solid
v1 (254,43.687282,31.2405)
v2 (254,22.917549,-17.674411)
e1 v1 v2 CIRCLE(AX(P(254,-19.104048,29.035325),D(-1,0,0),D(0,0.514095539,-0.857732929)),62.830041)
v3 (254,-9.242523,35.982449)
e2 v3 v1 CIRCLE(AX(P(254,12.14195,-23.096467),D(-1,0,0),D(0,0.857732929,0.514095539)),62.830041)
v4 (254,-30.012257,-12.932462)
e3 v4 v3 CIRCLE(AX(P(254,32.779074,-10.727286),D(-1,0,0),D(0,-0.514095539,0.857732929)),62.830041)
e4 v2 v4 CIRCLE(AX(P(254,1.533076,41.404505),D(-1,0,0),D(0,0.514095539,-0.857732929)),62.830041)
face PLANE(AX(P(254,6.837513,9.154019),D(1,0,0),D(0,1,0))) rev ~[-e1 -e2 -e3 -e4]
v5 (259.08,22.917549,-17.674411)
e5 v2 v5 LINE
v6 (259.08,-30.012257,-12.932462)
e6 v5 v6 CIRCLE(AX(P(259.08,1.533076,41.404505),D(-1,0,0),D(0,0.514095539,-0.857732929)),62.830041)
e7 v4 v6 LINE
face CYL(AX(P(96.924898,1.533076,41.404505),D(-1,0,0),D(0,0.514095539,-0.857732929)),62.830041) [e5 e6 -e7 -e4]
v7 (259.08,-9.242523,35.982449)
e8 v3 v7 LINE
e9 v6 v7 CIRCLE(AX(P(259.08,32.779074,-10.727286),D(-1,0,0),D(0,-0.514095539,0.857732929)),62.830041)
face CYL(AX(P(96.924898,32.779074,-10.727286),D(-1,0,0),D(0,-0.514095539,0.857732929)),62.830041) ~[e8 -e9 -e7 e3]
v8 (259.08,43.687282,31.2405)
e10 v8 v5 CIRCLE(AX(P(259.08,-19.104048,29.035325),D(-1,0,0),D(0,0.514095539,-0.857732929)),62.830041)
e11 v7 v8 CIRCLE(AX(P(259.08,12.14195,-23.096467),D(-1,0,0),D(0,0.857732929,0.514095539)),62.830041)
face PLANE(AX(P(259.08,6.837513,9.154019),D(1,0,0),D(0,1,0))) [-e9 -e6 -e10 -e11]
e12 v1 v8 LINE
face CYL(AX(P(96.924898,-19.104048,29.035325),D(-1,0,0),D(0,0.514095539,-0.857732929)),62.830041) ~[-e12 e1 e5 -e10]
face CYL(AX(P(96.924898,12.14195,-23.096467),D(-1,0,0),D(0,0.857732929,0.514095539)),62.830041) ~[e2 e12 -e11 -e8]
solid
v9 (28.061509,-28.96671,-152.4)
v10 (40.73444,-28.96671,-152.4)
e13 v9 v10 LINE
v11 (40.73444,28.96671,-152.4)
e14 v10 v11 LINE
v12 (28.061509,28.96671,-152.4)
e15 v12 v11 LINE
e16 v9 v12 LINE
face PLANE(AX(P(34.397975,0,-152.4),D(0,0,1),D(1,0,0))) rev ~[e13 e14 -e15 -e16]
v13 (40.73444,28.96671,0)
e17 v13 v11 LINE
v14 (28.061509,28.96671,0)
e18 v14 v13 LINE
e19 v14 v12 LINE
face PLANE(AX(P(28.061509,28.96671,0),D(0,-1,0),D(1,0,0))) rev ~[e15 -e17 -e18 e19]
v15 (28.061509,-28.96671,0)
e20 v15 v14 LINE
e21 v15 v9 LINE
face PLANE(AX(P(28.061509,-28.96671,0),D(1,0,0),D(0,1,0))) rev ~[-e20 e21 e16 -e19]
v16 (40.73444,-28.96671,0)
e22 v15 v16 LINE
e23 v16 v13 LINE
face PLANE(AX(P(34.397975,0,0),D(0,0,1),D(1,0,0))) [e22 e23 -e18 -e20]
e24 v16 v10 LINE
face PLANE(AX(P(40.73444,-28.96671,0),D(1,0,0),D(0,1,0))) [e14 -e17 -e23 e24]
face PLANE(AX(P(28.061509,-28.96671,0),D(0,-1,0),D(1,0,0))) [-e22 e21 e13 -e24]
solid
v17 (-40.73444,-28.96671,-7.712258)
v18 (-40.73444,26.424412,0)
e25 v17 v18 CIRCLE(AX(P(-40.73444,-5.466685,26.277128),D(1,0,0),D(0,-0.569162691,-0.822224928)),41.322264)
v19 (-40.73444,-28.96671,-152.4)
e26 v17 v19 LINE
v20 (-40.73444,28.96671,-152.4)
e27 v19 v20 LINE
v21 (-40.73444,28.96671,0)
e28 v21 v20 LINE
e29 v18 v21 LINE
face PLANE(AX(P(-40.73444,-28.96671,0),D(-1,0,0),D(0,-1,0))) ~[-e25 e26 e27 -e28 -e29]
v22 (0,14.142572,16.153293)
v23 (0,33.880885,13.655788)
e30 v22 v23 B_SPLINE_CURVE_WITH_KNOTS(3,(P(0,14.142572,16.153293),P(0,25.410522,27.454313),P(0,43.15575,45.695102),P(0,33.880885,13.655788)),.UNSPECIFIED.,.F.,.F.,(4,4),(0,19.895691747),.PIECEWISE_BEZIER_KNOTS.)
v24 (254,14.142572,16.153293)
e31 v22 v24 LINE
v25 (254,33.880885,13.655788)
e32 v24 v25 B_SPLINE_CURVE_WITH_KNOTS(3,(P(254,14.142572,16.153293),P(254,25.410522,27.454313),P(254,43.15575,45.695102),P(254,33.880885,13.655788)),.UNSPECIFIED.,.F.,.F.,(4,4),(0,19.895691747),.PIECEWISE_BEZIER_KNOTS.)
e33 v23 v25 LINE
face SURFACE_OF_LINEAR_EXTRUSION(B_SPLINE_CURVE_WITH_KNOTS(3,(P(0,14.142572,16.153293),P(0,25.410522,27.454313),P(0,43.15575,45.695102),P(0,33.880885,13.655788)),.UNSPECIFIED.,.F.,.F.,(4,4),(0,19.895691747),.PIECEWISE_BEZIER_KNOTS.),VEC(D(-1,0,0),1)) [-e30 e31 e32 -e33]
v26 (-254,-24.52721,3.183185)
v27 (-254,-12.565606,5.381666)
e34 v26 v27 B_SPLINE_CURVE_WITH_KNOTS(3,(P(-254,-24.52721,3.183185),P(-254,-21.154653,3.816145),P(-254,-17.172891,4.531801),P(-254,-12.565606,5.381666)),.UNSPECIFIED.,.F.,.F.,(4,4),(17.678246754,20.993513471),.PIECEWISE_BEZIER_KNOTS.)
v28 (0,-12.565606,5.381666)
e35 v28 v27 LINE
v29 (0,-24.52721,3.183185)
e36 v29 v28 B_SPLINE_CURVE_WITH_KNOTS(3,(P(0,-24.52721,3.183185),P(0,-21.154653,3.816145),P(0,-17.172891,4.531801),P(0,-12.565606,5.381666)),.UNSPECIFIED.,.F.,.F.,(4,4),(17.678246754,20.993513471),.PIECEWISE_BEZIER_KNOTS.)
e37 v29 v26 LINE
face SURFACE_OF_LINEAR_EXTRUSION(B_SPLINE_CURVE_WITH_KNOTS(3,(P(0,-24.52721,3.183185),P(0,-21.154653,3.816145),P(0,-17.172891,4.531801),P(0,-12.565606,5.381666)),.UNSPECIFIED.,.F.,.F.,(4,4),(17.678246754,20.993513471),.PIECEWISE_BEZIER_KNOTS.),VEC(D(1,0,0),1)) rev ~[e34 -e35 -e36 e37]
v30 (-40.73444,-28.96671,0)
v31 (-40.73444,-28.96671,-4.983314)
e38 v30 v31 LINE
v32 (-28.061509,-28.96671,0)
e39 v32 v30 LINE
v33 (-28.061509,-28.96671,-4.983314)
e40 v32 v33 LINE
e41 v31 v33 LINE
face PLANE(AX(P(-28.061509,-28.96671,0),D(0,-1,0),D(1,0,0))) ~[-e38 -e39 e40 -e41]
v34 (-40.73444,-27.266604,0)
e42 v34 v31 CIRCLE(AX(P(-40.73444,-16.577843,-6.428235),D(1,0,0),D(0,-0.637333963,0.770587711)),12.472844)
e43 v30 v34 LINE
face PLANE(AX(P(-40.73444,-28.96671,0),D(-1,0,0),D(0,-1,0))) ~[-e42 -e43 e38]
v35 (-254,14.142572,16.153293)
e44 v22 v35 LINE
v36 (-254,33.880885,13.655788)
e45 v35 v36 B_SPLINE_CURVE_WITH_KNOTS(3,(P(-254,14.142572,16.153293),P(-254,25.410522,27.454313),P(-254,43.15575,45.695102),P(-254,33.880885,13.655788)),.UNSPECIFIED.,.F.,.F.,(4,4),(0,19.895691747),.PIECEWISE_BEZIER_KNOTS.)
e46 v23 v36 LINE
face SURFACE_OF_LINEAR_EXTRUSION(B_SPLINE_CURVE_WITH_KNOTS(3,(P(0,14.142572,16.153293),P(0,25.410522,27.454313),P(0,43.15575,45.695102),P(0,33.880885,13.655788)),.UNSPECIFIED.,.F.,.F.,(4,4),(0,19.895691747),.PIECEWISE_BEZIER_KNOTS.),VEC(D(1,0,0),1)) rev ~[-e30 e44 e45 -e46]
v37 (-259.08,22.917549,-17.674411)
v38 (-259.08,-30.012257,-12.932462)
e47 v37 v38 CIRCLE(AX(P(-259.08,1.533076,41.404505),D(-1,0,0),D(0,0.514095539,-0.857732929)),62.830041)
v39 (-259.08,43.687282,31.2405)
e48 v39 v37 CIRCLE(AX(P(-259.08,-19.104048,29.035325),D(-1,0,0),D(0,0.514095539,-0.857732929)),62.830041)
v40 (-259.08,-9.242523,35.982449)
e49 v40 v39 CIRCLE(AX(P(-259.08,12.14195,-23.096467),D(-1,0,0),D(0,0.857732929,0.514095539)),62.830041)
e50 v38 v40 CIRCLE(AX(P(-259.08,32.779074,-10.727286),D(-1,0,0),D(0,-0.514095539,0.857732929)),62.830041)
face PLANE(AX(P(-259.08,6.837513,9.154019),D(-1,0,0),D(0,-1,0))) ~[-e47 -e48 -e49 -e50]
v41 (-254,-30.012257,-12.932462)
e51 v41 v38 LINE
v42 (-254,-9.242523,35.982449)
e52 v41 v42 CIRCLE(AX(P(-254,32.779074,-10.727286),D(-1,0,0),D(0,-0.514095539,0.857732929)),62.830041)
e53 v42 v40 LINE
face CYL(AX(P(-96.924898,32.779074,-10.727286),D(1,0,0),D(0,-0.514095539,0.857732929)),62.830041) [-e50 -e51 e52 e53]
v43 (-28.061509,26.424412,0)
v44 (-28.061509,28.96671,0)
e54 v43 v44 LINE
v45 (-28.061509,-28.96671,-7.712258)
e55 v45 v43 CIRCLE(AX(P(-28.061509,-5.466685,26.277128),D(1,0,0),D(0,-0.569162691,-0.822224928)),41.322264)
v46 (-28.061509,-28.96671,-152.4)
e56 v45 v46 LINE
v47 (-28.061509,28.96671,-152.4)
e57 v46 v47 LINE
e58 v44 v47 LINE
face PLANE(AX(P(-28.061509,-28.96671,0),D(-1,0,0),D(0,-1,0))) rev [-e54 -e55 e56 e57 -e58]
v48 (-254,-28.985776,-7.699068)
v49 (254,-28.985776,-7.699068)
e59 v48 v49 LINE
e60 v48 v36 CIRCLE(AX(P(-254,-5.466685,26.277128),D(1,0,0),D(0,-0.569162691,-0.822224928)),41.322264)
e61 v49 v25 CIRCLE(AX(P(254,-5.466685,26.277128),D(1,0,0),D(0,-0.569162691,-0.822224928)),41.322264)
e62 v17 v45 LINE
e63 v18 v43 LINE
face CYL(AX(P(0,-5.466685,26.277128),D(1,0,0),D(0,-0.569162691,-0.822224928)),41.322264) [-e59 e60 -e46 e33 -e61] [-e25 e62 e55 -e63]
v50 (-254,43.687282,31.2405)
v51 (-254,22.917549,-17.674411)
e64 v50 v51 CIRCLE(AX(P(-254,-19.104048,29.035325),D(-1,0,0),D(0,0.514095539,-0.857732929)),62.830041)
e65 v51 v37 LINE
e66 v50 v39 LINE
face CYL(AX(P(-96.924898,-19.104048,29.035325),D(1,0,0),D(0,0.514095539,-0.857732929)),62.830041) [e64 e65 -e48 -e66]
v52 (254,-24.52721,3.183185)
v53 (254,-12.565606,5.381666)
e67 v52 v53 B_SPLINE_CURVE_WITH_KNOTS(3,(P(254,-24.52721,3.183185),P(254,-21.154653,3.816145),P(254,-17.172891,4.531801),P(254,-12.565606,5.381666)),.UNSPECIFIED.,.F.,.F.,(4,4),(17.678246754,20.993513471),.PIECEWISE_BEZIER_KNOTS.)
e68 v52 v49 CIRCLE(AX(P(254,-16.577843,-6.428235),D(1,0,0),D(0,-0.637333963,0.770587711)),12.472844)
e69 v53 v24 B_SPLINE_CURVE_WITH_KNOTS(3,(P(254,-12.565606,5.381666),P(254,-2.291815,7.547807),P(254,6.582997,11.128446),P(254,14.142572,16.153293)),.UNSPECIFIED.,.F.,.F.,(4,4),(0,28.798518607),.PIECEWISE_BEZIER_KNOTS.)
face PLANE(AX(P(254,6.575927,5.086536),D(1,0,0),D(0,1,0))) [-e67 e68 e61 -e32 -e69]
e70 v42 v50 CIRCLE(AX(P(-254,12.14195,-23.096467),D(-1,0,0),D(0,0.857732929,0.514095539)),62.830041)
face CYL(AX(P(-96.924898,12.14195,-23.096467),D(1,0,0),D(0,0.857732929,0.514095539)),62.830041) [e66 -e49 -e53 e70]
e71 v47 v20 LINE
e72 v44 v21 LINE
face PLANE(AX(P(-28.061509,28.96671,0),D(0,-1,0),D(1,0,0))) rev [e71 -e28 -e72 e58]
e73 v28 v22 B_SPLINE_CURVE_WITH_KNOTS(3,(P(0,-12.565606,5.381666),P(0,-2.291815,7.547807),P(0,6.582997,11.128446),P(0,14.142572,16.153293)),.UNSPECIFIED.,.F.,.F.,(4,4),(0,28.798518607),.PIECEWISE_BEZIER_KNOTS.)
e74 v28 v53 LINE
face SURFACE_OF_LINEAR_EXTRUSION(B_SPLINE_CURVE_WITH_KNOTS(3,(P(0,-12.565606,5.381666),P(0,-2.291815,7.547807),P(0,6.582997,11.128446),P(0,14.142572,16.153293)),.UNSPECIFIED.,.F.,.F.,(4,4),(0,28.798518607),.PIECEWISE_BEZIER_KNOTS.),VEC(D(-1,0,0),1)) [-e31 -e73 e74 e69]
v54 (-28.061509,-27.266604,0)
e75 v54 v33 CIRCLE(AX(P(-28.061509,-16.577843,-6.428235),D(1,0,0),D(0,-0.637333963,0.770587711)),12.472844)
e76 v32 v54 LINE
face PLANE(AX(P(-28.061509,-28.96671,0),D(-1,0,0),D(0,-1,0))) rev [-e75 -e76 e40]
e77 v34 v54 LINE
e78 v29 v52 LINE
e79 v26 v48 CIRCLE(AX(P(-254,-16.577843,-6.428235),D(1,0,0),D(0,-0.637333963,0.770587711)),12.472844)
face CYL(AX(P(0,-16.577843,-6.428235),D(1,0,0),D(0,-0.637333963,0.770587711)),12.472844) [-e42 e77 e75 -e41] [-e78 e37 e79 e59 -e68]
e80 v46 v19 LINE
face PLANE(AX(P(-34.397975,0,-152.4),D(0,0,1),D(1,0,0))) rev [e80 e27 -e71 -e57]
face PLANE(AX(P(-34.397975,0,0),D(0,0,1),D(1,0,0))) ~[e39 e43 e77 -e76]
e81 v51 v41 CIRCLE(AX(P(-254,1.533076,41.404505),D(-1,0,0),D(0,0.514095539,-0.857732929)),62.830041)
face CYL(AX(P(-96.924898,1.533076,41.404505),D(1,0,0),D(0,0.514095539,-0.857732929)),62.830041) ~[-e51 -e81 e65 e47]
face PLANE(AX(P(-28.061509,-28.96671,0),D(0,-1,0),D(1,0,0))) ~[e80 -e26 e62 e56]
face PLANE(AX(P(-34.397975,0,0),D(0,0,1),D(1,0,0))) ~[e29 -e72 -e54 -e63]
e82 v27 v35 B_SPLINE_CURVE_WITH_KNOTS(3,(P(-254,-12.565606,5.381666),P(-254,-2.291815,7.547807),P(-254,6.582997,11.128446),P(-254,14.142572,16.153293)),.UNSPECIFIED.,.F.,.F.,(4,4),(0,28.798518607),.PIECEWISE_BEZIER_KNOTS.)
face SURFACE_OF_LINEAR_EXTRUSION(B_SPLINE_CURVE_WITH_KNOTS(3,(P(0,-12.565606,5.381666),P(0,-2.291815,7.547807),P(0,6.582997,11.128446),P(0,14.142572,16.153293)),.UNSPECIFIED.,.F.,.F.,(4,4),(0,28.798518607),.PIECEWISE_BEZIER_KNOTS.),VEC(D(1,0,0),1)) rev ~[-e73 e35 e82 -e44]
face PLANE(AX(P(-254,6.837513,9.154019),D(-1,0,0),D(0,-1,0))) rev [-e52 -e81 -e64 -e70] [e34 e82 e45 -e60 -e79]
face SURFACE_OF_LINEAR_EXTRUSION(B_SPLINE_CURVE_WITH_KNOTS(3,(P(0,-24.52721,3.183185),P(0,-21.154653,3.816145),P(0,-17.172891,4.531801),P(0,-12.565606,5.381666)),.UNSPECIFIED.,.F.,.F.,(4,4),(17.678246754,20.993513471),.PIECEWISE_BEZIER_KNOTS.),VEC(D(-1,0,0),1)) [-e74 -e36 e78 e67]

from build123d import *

# Parameters (mm, degrees)
F1_DEPTH    = 254
F3_DEPTH    = 5.08
F4_W        = 12.6729309559
F4_H        = 57.9334199429
F5_DEPTH    = 152.4
F6_T1_DEPTH = 319.230203427


# Not quite as in the source:
# - a fillet or chamfer that OpenCascade refuses, or shapes differently, is made with other operations: its cross-section is extruded or revolved along the edge and cut away or added


with BuildPart() as f1:
    # F0 (on Right) → F1 (new body)
    with BuildSketch(Plane.YZ):
        with BuildLine():
            ThreePointArc((-24.5272097082, 3.183184572), (-28.1195399904, -1.6994877312), (-28.9857762817, -7.6990677469))
            ThreePointArc((-28.9857762817, -7.6990677469), (7.8240128757, -12.8494213203), (33.8808850254, 13.655788234))
            add(Edge.make_bspline(
                [(14.1425715482, 16.1532932262), (25.4105223066, 27.4543127656), (43.1557495947, 45.6951015007), (33.8808850254, 13.655788234)],
                knots=[0, 0, 0, 0, 19.8956917475, 19.8956917475, 19.8956917475, 19.8956917475], degree=3))
            add(Edge.make_bspline(
                [(-12.5656056095, 5.3816662895), (-2.2918152978, 7.5478072589), (6.5829970209, 11.1284464372), (14.1425715482, 16.1532932262)],
                knots=[0, 0, 0, 0, 28.7985186069, 28.7985186069, 28.7985186069, 28.7985186069], degree=3))
            add(Edge.make_bspline(
                [(-24.5272097082, 3.183184572), (-21.1546527218, 3.8161453558), (-17.1728906965, 4.5318009653), (-12.5656056095, 5.3816662895)],
                knots=[17.6782467535, 17.6782467535, 17.6782467535, 17.6782467535, 20.9935134705, 20.9935134705, 20.9935134705, 20.9935134705], degree=3))
        make_face()
    extrude(amount=F1_DEPTH)

    # F7: F1, F3, F5 across face


with BuildPart() as f3:
    # F2 (on face) → F3 (new body)
    with BuildSketch(Plane.YZ.offset(254)):
        Polygon((33.7327011203, 63.0955714471), (-53.4129644445, 10.863464719), (-20.0576754131, -44.7875331985), (67.0879901518, 7.4445735296), align=None)
    extrude(amount=F3_DEPTH)

    # F6: fillet of radius 62.8300406854 on 4 edges, made by hand

    # F6_s2 → F6_t1 (cut)
    with BuildSketch(Plane.YZ.offset(96.9248982865)):
        with BuildLine():
            ThreePointArc((33.8337193999, -12.4868895882), (-13.7338907968, -19.5424696286), (-52.3583190234, 9.1038616144))
            Line((-52.3583190234, 9.1038616144), (-20.0576754131, -44.7875331985))
            Line((-20.0576754131, -44.7875331985), (33.8337193999, -12.4868895882))
        make_face()
        with BuildLine():
            ThreePointArc((0.4784303684, 43.1641083293), (-28.1679008746, 4.5396801026), (-21.1123208342, -43.027930094))
            Line((-21.1123208342, -43.027930094), (-53.4129644445, 10.863464719))
            Line((-53.4129644445, 10.863464719), (0.4784303684, 43.1641083293))
        make_face()
        with BuildLine():
            ThreePointArc((66.0333447307, 9.2041766341), (27.408916504, 37.8505078772), (-20.1586936926, 30.7949278367))
            Line((-20.1586936926, 30.7949278367), (33.7327011203, 63.0955714471))
            Line((33.7327011203, 63.0955714471), (66.0333447307, 9.2041766341))
        make_face()
        with BuildLine():
            ThreePointArc((13.1965953388, -24.8560700808), (41.8429265819, 13.7683581459), (34.7873465414, 61.3359683426))
            Line((34.7873465414, 61.3359683426), (67.0879901518, 7.4445735296))
            Line((67.0879901518, 7.4445735296), (13.1965953388, -24.8560700808))
        make_face()
    extrude(amount=F6_T1_DEPTH, mode=Mode.SUBTRACT)


with BuildPart() as f5:
    # F4 (on Top) → F5 (new body)
    with BuildSketch(Plane.XY):
        with Locations((34.3979746103, 0)):
            Rectangle(F4_W, F4_H)
    extrude(amount=-F5_DEPTH)


with BuildPart() as f1_1:
    add(f1.part)
    add(f1.part.mirror(Plane(origin=(0, 6.6636224676, 3.2061249458), x_dir=(0, 1, 0), z_dir=(-1, 0, 0))))
    add(f3.part.mirror(Plane(origin=(0, 6.6636224676, 3.2061249458), x_dir=(0, 1, 0), z_dir=(-1, 0, 0))))
    add(f5.part.mirror(Plane(origin=(0, 6.6636224676, 3.2061249458), x_dir=(0, 1, 0), z_dir=(-1, 0, 0))))


solid = Compound([f3.part, f5.part, f1_1.part])
